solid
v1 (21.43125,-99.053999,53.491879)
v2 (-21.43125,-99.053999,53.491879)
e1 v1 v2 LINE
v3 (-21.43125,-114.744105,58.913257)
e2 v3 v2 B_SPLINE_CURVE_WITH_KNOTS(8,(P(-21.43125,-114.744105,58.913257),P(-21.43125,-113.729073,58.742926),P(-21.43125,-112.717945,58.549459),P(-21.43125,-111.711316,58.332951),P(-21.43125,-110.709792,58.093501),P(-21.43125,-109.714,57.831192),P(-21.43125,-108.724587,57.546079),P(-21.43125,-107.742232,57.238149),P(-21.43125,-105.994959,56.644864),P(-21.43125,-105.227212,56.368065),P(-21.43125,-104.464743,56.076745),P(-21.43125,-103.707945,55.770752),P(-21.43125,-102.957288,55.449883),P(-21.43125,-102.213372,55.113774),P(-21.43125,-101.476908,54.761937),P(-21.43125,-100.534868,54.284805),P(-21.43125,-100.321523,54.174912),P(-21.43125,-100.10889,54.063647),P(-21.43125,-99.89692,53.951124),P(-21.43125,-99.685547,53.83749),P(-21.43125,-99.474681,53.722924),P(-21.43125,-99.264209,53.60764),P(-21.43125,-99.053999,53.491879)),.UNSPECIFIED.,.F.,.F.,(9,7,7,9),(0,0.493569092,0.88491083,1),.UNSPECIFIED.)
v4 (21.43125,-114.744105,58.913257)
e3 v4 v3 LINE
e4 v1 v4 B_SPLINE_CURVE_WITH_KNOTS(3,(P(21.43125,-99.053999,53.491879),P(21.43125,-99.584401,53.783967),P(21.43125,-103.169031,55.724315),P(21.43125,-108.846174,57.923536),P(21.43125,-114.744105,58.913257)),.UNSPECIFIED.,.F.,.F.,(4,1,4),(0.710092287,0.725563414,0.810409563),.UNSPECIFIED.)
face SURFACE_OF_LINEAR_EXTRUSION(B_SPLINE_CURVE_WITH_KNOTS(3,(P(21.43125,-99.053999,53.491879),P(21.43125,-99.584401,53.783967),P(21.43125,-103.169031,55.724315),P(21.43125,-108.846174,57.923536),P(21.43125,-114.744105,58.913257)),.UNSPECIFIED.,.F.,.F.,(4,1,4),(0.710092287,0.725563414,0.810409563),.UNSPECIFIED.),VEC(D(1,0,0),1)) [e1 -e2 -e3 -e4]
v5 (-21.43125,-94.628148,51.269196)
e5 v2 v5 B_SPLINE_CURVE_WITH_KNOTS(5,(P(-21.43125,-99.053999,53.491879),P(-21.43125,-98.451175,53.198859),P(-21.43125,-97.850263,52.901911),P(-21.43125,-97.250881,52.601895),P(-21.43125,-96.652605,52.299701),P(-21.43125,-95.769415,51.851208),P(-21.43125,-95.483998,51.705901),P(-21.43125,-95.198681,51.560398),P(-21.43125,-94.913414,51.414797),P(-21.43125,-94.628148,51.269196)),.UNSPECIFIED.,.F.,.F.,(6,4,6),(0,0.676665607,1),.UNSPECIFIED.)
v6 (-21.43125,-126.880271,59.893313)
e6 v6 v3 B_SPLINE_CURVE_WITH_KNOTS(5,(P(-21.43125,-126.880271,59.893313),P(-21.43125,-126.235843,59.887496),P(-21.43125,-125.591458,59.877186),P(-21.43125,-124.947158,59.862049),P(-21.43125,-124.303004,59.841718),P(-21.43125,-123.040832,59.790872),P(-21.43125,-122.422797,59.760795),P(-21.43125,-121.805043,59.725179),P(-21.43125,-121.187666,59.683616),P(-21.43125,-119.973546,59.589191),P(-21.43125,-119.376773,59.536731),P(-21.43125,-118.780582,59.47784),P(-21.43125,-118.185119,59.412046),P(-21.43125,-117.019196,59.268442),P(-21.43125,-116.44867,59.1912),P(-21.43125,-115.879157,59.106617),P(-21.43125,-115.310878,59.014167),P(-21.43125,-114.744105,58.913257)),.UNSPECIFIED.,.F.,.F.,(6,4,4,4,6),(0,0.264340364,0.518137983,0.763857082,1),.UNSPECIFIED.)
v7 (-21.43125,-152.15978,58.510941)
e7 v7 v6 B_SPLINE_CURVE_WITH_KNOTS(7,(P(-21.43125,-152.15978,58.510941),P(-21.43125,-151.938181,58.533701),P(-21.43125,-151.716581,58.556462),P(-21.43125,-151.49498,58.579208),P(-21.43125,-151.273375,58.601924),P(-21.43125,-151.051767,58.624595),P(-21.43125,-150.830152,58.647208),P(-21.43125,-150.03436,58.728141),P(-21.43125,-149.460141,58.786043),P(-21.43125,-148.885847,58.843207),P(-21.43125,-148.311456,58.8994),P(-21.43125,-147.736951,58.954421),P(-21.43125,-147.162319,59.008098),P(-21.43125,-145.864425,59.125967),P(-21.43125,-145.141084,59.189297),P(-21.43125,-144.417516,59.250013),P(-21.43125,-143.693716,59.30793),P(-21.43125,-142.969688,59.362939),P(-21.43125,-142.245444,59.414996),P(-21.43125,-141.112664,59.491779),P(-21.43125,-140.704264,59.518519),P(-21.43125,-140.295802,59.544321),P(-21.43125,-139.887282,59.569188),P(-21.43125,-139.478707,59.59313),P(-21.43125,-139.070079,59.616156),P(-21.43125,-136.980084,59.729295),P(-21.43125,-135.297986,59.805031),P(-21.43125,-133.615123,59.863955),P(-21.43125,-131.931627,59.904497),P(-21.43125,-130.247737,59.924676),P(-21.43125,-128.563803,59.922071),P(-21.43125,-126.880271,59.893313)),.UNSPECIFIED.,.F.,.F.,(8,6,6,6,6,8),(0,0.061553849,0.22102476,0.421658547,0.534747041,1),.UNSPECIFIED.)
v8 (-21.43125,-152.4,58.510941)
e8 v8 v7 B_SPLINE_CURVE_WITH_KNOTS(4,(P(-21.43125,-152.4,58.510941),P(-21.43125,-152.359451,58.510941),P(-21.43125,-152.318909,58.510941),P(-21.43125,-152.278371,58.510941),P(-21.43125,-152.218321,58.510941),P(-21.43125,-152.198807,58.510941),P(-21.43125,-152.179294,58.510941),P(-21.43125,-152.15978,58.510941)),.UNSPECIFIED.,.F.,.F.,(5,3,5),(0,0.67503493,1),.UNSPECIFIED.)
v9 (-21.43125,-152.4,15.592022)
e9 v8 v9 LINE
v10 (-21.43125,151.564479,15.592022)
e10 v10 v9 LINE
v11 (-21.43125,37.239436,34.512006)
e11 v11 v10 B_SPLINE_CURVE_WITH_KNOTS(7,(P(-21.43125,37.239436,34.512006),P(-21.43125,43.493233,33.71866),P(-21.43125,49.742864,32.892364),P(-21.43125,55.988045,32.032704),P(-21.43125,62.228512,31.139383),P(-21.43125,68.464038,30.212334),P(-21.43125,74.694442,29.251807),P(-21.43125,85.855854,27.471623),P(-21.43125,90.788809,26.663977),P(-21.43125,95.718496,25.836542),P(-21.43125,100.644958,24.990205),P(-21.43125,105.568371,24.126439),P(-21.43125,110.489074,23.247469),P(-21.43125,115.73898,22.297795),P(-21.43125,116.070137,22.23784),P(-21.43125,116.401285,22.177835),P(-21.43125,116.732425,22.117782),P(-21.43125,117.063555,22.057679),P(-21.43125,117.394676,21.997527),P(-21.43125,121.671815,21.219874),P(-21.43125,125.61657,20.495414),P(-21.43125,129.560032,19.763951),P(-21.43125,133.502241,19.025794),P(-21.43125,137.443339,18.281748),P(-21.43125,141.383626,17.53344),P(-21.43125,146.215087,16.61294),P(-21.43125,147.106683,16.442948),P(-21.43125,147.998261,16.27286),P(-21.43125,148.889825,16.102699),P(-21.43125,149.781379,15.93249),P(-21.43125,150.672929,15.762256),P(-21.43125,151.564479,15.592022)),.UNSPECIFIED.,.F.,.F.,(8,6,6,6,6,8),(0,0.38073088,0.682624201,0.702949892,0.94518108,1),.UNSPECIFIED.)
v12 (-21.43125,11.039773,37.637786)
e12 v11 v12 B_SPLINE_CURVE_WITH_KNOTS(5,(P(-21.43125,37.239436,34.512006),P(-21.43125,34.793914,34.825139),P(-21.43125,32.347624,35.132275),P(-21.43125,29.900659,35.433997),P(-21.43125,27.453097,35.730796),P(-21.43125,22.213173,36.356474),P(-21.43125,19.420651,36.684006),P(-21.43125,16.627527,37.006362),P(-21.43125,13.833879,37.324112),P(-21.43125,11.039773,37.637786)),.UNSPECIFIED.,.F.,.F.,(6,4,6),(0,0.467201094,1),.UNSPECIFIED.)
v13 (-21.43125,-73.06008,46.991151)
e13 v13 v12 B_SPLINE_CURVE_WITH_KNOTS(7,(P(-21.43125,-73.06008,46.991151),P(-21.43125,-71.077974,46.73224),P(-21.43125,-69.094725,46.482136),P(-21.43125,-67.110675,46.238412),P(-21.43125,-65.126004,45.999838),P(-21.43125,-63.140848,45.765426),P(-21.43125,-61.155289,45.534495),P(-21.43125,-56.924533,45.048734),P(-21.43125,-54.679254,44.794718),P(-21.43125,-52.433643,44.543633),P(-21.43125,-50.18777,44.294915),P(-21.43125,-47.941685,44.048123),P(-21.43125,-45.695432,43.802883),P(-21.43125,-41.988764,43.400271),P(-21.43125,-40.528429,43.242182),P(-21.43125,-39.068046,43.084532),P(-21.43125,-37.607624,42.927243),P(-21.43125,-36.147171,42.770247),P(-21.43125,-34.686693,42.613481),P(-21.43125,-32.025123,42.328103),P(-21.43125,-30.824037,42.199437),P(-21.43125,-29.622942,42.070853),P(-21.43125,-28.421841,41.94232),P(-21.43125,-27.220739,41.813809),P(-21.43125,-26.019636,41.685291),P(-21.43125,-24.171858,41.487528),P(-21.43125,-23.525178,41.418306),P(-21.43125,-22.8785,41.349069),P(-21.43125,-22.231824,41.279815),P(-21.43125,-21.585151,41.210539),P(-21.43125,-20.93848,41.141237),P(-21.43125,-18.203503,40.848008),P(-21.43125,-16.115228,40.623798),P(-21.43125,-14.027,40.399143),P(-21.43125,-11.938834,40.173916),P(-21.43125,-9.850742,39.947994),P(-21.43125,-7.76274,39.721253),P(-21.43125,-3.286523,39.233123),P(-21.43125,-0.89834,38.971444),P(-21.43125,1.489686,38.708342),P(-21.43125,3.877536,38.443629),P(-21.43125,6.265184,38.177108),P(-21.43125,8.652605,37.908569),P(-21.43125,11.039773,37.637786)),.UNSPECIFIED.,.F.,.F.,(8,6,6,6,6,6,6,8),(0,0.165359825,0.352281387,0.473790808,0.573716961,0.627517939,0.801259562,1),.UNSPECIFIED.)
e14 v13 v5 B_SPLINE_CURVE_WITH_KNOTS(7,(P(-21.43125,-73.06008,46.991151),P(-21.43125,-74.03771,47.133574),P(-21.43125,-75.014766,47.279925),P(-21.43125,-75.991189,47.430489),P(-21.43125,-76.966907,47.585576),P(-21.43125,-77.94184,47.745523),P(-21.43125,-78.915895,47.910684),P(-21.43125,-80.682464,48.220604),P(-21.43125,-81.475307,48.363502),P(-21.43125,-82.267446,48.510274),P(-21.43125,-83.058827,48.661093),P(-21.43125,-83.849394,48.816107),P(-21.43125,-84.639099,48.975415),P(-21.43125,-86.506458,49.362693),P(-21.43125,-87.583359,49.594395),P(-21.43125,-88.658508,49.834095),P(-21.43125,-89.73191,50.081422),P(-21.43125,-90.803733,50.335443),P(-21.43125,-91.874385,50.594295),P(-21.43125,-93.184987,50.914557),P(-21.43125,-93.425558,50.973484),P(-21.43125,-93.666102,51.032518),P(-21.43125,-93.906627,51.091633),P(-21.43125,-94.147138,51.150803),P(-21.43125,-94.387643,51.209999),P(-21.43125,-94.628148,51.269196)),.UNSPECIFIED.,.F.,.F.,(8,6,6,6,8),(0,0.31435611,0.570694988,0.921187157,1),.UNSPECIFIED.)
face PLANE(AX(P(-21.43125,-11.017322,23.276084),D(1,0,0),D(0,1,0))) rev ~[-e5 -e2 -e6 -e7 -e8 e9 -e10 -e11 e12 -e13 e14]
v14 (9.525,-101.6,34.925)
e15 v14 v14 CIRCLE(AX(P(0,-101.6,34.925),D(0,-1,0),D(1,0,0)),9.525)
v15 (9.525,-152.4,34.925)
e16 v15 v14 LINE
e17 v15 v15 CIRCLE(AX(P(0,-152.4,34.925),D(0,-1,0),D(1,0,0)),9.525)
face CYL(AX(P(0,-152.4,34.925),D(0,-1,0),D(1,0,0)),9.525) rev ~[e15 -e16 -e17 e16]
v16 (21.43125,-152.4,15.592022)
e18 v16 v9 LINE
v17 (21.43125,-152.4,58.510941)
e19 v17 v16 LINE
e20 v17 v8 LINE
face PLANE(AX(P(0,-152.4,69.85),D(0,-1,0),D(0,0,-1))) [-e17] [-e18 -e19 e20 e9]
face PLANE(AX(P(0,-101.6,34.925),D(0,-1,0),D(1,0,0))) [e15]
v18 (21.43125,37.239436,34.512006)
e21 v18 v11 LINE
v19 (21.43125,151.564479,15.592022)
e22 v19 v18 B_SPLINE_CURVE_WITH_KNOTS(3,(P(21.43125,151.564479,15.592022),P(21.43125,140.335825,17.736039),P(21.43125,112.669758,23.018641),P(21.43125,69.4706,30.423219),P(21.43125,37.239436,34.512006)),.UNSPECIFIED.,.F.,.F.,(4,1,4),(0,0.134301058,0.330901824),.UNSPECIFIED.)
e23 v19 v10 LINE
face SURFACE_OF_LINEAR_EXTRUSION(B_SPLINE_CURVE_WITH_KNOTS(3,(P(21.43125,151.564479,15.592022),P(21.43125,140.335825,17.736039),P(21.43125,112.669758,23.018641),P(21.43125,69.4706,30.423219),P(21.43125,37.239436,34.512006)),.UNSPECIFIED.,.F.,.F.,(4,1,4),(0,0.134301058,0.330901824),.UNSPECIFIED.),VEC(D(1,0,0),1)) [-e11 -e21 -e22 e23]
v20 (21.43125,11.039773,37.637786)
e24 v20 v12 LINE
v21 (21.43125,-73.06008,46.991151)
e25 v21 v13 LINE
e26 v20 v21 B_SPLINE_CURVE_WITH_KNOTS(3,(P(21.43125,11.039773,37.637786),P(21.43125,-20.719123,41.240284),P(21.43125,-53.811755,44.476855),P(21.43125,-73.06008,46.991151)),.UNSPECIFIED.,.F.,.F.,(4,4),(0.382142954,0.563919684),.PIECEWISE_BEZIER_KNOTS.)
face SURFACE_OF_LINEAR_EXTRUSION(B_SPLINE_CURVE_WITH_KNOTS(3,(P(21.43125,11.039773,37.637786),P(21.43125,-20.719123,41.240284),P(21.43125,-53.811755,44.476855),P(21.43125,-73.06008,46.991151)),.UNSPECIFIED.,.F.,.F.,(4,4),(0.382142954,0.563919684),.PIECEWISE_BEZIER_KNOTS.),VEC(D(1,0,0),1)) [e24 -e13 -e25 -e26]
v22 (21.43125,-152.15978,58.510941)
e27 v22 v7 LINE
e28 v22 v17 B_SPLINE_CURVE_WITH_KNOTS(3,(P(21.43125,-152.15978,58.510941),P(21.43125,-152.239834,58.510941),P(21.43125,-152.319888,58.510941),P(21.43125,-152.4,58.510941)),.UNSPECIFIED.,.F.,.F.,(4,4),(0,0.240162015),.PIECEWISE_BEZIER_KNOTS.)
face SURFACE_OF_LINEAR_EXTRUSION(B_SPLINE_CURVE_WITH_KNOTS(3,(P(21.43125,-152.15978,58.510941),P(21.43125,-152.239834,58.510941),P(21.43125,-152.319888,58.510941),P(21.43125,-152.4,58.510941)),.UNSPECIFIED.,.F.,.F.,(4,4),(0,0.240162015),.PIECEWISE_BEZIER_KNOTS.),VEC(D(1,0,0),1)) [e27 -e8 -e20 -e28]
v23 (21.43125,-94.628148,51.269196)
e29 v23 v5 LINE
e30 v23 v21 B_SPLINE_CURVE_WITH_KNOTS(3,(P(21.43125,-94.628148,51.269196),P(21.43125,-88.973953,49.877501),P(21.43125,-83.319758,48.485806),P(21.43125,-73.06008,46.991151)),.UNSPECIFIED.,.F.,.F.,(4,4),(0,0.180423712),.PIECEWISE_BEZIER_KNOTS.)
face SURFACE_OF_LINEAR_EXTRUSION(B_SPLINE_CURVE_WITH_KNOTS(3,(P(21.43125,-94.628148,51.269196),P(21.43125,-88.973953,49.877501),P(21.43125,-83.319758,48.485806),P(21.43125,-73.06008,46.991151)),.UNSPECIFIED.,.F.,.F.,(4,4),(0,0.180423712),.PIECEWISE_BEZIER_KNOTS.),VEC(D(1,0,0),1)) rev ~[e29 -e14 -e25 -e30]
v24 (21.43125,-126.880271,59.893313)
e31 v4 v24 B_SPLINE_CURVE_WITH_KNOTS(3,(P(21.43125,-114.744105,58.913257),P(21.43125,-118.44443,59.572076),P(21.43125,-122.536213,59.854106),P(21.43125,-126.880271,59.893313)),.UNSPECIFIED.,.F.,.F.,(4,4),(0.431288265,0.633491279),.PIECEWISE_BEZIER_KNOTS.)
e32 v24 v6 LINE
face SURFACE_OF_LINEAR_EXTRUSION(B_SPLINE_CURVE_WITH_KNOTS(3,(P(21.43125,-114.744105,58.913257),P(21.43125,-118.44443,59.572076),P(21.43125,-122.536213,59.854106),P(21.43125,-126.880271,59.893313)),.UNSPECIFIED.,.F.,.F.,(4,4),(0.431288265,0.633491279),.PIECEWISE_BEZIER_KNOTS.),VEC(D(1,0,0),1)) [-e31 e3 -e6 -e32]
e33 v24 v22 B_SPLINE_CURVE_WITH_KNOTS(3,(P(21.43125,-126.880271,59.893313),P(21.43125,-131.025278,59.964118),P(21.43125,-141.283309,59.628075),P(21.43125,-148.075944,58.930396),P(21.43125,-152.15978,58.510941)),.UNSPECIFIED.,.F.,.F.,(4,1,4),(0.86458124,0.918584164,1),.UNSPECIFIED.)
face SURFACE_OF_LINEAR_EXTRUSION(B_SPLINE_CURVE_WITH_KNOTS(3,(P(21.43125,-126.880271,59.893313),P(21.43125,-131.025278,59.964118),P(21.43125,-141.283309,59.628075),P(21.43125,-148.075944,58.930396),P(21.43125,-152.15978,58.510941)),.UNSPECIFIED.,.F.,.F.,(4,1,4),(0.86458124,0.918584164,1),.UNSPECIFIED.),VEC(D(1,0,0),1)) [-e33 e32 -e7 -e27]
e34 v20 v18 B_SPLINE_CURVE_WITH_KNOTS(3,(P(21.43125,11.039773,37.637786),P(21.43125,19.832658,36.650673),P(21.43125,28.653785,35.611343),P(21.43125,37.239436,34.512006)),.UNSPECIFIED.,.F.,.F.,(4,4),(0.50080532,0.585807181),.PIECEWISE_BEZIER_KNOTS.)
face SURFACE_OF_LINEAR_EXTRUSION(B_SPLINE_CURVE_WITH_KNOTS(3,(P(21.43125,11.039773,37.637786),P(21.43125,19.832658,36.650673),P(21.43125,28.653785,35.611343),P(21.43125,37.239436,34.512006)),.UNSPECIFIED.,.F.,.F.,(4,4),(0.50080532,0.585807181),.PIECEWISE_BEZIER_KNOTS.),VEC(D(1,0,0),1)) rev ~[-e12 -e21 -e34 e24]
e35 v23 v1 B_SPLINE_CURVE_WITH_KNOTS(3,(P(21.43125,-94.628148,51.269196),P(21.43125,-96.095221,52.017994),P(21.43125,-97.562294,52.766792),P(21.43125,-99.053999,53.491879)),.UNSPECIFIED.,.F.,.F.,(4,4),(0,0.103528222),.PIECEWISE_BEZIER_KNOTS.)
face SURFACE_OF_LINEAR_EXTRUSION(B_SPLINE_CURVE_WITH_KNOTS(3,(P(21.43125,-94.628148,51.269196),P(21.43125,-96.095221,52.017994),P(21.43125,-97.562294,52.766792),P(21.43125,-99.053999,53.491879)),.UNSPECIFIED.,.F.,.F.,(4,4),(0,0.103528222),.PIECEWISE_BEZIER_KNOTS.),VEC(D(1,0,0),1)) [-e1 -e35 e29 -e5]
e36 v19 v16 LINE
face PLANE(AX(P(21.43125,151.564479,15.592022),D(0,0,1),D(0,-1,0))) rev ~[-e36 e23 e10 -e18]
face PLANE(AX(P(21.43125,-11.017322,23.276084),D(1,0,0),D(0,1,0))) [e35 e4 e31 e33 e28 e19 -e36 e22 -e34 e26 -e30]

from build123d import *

# Parameters (mm, degrees)
F1_DEPTH = 21.43125
F2_R     = 9.525
F3_DEPTH = 50.8
F8_DEPTH = 56.3


# Not quite as in the source:
# - ends of sketch curves that miss each other by under 0.0002 mm in the source are joined


with BuildPart() as f1:
    # F0 (on Right) → F1 (new body, symmetric)
    with BuildSketch(Plane.YZ):
        Polygon((-152.4, 69.85), (-152.4, 0), (152.4, 0), (152.4, 19.05), align=None)
    extrude(amount=F1_DEPTH, both=True)

    # F2 (on face) → F3 (cut)
    with BuildSketch(Plane.XZ.offset(152.4)):
        with Locations((0, 34.925)):
            Circle(F2_R)
    extrude(amount=-F3_DEPTH, mode=Mode.SUBTRACT)

    # F5 (on face) → F8 (cut)
    with BuildSketch(Plane.YZ.offset(21.43125)):
        with BuildLine():
            add(Edge.make_bspline(
                [(-94.6281477809, 51.2691959739), (-96.0952206694, 52.0179937663), (-97.562293558, 52.7667915588), (-99.0539994454, 53.491879309)],
                knots=[0, 0, 0, 0, 0.1035282224, 0.1035282224, 0.1035282224, 0.1035282224], degree=3))
            add(Edge.make_bspline(
                [(-94.6281477809, 51.2691959739), (-88.9739529123, 49.8775010567), (-83.3197580522, 48.4858061416), (-73.0600804397, 46.9911508307)],
                knots=[0, 0, 0, 0, 0.1804237123, 0.1804237123, 0.1804237123, 0.1804237123], degree=3))
            add(Edge.make_bspline(
                [(11.0397725003, 37.6377859426), (-20.7191231776, 41.240284312), (-53.8117553476, 44.4768553148), (-73.0600804397, 46.9911508307)],
                knots=[0.3821429542, 0.3821429542, 0.3821429542, 0.3821429542, 0.5639196837, 0.5639196837, 0.5639196837, 0.5639196837], degree=3))
            add(Edge.make_bspline(
                [(11.0397725003, 37.6377859426), (19.8326583687, 36.6506728683), (28.6537852654, 35.611343032), (37.2394360057, 34.5120057533)],
                knots=[0.5008053198, 0.5008053198, 0.5008053198, 0.5008053198, 0.5858071806, 0.5858071806, 0.5858071806, 0.5858071806], degree=3))
            add(Edge.make_bspline(
                [(151.5644788742, 15.5920218676), (140.3358248303, 17.736038831), (112.6697575345, 23.0186414795), (69.4706003693, 30.4232191611), (37.2394360057, 34.5120057533)],
                knots=[0, 0, 0, 0, 0.1343010577, 0.3309018237, 0.3309018237, 0.3309018237, 0.3309018237], degree=3))
            Line((151.5644788742, 15.5920218676), (-152.4, 15.5920218676))
            Line((-152.4, 15.5920218676), (-152.4, 0))
            Line((-152.4, 0), (152.4, 0))
            Line((152.4, 0), (152.4, 19.05))
            Line((152.4, 19.05), (-152.4, 69.85))
            Line((-152.4, 69.85), (-152.4, 58.510940522))
            add(Edge.make_bspline(
                [(-152.1597802639, 58.510940522), (-152.2398342689, 58.510940522), (-152.3198882739, 58.510940522), (-152.4, 58.510940522)],
                knots=[0, 0, 0, 0, 0.240162015, 0.240162015, 0.240162015, 0.240162015], degree=3))
            add(Edge.make_bspline(
                [(-126.880271242, 59.893312547), (-131.0252775202, 59.9641176604), (-141.283309107, 59.6280745769), (-148.0759439731, 58.9303957414), (-152.1597802639, 58.510940522)],
                knots=[0.8645812396, 0.8645812396, 0.8645812396, 0.8645812396, 0.9185841637, 1, 1, 1, 1], degree=3))
            add(Edge.make_bspline(
                [(-114.7441045161, 58.9132569857), (-118.4444301689, 59.5720764958), (-122.5362126789, 59.8541063708), (-126.880271242, 59.893312547)],
                knots=[0.431288265, 0.431288265, 0.431288265, 0.431288265, 0.6334912794, 0.6334912794, 0.6334912794, 0.6334912794], degree=3))
            add(Edge.make_bspline(
                [(-99.0539994454, 53.491879309), (-99.5844007901, 53.7839672826), (-103.1690308471, 55.7243154808), (-108.8461739052, 57.9235356565), (-114.7441045161, 58.9132569857)],
                knots=[0.7100922868, 0.7100922868, 0.7100922868, 0.7100922868, 0.7255634136, 0.8104095628, 0.8104095628, 0.8104095628, 0.8104095628], degree=3))
        make_face()
    extrude(amount=-F8_DEPTH, mode=Mode.SUBTRACT)


solid = f1.part
